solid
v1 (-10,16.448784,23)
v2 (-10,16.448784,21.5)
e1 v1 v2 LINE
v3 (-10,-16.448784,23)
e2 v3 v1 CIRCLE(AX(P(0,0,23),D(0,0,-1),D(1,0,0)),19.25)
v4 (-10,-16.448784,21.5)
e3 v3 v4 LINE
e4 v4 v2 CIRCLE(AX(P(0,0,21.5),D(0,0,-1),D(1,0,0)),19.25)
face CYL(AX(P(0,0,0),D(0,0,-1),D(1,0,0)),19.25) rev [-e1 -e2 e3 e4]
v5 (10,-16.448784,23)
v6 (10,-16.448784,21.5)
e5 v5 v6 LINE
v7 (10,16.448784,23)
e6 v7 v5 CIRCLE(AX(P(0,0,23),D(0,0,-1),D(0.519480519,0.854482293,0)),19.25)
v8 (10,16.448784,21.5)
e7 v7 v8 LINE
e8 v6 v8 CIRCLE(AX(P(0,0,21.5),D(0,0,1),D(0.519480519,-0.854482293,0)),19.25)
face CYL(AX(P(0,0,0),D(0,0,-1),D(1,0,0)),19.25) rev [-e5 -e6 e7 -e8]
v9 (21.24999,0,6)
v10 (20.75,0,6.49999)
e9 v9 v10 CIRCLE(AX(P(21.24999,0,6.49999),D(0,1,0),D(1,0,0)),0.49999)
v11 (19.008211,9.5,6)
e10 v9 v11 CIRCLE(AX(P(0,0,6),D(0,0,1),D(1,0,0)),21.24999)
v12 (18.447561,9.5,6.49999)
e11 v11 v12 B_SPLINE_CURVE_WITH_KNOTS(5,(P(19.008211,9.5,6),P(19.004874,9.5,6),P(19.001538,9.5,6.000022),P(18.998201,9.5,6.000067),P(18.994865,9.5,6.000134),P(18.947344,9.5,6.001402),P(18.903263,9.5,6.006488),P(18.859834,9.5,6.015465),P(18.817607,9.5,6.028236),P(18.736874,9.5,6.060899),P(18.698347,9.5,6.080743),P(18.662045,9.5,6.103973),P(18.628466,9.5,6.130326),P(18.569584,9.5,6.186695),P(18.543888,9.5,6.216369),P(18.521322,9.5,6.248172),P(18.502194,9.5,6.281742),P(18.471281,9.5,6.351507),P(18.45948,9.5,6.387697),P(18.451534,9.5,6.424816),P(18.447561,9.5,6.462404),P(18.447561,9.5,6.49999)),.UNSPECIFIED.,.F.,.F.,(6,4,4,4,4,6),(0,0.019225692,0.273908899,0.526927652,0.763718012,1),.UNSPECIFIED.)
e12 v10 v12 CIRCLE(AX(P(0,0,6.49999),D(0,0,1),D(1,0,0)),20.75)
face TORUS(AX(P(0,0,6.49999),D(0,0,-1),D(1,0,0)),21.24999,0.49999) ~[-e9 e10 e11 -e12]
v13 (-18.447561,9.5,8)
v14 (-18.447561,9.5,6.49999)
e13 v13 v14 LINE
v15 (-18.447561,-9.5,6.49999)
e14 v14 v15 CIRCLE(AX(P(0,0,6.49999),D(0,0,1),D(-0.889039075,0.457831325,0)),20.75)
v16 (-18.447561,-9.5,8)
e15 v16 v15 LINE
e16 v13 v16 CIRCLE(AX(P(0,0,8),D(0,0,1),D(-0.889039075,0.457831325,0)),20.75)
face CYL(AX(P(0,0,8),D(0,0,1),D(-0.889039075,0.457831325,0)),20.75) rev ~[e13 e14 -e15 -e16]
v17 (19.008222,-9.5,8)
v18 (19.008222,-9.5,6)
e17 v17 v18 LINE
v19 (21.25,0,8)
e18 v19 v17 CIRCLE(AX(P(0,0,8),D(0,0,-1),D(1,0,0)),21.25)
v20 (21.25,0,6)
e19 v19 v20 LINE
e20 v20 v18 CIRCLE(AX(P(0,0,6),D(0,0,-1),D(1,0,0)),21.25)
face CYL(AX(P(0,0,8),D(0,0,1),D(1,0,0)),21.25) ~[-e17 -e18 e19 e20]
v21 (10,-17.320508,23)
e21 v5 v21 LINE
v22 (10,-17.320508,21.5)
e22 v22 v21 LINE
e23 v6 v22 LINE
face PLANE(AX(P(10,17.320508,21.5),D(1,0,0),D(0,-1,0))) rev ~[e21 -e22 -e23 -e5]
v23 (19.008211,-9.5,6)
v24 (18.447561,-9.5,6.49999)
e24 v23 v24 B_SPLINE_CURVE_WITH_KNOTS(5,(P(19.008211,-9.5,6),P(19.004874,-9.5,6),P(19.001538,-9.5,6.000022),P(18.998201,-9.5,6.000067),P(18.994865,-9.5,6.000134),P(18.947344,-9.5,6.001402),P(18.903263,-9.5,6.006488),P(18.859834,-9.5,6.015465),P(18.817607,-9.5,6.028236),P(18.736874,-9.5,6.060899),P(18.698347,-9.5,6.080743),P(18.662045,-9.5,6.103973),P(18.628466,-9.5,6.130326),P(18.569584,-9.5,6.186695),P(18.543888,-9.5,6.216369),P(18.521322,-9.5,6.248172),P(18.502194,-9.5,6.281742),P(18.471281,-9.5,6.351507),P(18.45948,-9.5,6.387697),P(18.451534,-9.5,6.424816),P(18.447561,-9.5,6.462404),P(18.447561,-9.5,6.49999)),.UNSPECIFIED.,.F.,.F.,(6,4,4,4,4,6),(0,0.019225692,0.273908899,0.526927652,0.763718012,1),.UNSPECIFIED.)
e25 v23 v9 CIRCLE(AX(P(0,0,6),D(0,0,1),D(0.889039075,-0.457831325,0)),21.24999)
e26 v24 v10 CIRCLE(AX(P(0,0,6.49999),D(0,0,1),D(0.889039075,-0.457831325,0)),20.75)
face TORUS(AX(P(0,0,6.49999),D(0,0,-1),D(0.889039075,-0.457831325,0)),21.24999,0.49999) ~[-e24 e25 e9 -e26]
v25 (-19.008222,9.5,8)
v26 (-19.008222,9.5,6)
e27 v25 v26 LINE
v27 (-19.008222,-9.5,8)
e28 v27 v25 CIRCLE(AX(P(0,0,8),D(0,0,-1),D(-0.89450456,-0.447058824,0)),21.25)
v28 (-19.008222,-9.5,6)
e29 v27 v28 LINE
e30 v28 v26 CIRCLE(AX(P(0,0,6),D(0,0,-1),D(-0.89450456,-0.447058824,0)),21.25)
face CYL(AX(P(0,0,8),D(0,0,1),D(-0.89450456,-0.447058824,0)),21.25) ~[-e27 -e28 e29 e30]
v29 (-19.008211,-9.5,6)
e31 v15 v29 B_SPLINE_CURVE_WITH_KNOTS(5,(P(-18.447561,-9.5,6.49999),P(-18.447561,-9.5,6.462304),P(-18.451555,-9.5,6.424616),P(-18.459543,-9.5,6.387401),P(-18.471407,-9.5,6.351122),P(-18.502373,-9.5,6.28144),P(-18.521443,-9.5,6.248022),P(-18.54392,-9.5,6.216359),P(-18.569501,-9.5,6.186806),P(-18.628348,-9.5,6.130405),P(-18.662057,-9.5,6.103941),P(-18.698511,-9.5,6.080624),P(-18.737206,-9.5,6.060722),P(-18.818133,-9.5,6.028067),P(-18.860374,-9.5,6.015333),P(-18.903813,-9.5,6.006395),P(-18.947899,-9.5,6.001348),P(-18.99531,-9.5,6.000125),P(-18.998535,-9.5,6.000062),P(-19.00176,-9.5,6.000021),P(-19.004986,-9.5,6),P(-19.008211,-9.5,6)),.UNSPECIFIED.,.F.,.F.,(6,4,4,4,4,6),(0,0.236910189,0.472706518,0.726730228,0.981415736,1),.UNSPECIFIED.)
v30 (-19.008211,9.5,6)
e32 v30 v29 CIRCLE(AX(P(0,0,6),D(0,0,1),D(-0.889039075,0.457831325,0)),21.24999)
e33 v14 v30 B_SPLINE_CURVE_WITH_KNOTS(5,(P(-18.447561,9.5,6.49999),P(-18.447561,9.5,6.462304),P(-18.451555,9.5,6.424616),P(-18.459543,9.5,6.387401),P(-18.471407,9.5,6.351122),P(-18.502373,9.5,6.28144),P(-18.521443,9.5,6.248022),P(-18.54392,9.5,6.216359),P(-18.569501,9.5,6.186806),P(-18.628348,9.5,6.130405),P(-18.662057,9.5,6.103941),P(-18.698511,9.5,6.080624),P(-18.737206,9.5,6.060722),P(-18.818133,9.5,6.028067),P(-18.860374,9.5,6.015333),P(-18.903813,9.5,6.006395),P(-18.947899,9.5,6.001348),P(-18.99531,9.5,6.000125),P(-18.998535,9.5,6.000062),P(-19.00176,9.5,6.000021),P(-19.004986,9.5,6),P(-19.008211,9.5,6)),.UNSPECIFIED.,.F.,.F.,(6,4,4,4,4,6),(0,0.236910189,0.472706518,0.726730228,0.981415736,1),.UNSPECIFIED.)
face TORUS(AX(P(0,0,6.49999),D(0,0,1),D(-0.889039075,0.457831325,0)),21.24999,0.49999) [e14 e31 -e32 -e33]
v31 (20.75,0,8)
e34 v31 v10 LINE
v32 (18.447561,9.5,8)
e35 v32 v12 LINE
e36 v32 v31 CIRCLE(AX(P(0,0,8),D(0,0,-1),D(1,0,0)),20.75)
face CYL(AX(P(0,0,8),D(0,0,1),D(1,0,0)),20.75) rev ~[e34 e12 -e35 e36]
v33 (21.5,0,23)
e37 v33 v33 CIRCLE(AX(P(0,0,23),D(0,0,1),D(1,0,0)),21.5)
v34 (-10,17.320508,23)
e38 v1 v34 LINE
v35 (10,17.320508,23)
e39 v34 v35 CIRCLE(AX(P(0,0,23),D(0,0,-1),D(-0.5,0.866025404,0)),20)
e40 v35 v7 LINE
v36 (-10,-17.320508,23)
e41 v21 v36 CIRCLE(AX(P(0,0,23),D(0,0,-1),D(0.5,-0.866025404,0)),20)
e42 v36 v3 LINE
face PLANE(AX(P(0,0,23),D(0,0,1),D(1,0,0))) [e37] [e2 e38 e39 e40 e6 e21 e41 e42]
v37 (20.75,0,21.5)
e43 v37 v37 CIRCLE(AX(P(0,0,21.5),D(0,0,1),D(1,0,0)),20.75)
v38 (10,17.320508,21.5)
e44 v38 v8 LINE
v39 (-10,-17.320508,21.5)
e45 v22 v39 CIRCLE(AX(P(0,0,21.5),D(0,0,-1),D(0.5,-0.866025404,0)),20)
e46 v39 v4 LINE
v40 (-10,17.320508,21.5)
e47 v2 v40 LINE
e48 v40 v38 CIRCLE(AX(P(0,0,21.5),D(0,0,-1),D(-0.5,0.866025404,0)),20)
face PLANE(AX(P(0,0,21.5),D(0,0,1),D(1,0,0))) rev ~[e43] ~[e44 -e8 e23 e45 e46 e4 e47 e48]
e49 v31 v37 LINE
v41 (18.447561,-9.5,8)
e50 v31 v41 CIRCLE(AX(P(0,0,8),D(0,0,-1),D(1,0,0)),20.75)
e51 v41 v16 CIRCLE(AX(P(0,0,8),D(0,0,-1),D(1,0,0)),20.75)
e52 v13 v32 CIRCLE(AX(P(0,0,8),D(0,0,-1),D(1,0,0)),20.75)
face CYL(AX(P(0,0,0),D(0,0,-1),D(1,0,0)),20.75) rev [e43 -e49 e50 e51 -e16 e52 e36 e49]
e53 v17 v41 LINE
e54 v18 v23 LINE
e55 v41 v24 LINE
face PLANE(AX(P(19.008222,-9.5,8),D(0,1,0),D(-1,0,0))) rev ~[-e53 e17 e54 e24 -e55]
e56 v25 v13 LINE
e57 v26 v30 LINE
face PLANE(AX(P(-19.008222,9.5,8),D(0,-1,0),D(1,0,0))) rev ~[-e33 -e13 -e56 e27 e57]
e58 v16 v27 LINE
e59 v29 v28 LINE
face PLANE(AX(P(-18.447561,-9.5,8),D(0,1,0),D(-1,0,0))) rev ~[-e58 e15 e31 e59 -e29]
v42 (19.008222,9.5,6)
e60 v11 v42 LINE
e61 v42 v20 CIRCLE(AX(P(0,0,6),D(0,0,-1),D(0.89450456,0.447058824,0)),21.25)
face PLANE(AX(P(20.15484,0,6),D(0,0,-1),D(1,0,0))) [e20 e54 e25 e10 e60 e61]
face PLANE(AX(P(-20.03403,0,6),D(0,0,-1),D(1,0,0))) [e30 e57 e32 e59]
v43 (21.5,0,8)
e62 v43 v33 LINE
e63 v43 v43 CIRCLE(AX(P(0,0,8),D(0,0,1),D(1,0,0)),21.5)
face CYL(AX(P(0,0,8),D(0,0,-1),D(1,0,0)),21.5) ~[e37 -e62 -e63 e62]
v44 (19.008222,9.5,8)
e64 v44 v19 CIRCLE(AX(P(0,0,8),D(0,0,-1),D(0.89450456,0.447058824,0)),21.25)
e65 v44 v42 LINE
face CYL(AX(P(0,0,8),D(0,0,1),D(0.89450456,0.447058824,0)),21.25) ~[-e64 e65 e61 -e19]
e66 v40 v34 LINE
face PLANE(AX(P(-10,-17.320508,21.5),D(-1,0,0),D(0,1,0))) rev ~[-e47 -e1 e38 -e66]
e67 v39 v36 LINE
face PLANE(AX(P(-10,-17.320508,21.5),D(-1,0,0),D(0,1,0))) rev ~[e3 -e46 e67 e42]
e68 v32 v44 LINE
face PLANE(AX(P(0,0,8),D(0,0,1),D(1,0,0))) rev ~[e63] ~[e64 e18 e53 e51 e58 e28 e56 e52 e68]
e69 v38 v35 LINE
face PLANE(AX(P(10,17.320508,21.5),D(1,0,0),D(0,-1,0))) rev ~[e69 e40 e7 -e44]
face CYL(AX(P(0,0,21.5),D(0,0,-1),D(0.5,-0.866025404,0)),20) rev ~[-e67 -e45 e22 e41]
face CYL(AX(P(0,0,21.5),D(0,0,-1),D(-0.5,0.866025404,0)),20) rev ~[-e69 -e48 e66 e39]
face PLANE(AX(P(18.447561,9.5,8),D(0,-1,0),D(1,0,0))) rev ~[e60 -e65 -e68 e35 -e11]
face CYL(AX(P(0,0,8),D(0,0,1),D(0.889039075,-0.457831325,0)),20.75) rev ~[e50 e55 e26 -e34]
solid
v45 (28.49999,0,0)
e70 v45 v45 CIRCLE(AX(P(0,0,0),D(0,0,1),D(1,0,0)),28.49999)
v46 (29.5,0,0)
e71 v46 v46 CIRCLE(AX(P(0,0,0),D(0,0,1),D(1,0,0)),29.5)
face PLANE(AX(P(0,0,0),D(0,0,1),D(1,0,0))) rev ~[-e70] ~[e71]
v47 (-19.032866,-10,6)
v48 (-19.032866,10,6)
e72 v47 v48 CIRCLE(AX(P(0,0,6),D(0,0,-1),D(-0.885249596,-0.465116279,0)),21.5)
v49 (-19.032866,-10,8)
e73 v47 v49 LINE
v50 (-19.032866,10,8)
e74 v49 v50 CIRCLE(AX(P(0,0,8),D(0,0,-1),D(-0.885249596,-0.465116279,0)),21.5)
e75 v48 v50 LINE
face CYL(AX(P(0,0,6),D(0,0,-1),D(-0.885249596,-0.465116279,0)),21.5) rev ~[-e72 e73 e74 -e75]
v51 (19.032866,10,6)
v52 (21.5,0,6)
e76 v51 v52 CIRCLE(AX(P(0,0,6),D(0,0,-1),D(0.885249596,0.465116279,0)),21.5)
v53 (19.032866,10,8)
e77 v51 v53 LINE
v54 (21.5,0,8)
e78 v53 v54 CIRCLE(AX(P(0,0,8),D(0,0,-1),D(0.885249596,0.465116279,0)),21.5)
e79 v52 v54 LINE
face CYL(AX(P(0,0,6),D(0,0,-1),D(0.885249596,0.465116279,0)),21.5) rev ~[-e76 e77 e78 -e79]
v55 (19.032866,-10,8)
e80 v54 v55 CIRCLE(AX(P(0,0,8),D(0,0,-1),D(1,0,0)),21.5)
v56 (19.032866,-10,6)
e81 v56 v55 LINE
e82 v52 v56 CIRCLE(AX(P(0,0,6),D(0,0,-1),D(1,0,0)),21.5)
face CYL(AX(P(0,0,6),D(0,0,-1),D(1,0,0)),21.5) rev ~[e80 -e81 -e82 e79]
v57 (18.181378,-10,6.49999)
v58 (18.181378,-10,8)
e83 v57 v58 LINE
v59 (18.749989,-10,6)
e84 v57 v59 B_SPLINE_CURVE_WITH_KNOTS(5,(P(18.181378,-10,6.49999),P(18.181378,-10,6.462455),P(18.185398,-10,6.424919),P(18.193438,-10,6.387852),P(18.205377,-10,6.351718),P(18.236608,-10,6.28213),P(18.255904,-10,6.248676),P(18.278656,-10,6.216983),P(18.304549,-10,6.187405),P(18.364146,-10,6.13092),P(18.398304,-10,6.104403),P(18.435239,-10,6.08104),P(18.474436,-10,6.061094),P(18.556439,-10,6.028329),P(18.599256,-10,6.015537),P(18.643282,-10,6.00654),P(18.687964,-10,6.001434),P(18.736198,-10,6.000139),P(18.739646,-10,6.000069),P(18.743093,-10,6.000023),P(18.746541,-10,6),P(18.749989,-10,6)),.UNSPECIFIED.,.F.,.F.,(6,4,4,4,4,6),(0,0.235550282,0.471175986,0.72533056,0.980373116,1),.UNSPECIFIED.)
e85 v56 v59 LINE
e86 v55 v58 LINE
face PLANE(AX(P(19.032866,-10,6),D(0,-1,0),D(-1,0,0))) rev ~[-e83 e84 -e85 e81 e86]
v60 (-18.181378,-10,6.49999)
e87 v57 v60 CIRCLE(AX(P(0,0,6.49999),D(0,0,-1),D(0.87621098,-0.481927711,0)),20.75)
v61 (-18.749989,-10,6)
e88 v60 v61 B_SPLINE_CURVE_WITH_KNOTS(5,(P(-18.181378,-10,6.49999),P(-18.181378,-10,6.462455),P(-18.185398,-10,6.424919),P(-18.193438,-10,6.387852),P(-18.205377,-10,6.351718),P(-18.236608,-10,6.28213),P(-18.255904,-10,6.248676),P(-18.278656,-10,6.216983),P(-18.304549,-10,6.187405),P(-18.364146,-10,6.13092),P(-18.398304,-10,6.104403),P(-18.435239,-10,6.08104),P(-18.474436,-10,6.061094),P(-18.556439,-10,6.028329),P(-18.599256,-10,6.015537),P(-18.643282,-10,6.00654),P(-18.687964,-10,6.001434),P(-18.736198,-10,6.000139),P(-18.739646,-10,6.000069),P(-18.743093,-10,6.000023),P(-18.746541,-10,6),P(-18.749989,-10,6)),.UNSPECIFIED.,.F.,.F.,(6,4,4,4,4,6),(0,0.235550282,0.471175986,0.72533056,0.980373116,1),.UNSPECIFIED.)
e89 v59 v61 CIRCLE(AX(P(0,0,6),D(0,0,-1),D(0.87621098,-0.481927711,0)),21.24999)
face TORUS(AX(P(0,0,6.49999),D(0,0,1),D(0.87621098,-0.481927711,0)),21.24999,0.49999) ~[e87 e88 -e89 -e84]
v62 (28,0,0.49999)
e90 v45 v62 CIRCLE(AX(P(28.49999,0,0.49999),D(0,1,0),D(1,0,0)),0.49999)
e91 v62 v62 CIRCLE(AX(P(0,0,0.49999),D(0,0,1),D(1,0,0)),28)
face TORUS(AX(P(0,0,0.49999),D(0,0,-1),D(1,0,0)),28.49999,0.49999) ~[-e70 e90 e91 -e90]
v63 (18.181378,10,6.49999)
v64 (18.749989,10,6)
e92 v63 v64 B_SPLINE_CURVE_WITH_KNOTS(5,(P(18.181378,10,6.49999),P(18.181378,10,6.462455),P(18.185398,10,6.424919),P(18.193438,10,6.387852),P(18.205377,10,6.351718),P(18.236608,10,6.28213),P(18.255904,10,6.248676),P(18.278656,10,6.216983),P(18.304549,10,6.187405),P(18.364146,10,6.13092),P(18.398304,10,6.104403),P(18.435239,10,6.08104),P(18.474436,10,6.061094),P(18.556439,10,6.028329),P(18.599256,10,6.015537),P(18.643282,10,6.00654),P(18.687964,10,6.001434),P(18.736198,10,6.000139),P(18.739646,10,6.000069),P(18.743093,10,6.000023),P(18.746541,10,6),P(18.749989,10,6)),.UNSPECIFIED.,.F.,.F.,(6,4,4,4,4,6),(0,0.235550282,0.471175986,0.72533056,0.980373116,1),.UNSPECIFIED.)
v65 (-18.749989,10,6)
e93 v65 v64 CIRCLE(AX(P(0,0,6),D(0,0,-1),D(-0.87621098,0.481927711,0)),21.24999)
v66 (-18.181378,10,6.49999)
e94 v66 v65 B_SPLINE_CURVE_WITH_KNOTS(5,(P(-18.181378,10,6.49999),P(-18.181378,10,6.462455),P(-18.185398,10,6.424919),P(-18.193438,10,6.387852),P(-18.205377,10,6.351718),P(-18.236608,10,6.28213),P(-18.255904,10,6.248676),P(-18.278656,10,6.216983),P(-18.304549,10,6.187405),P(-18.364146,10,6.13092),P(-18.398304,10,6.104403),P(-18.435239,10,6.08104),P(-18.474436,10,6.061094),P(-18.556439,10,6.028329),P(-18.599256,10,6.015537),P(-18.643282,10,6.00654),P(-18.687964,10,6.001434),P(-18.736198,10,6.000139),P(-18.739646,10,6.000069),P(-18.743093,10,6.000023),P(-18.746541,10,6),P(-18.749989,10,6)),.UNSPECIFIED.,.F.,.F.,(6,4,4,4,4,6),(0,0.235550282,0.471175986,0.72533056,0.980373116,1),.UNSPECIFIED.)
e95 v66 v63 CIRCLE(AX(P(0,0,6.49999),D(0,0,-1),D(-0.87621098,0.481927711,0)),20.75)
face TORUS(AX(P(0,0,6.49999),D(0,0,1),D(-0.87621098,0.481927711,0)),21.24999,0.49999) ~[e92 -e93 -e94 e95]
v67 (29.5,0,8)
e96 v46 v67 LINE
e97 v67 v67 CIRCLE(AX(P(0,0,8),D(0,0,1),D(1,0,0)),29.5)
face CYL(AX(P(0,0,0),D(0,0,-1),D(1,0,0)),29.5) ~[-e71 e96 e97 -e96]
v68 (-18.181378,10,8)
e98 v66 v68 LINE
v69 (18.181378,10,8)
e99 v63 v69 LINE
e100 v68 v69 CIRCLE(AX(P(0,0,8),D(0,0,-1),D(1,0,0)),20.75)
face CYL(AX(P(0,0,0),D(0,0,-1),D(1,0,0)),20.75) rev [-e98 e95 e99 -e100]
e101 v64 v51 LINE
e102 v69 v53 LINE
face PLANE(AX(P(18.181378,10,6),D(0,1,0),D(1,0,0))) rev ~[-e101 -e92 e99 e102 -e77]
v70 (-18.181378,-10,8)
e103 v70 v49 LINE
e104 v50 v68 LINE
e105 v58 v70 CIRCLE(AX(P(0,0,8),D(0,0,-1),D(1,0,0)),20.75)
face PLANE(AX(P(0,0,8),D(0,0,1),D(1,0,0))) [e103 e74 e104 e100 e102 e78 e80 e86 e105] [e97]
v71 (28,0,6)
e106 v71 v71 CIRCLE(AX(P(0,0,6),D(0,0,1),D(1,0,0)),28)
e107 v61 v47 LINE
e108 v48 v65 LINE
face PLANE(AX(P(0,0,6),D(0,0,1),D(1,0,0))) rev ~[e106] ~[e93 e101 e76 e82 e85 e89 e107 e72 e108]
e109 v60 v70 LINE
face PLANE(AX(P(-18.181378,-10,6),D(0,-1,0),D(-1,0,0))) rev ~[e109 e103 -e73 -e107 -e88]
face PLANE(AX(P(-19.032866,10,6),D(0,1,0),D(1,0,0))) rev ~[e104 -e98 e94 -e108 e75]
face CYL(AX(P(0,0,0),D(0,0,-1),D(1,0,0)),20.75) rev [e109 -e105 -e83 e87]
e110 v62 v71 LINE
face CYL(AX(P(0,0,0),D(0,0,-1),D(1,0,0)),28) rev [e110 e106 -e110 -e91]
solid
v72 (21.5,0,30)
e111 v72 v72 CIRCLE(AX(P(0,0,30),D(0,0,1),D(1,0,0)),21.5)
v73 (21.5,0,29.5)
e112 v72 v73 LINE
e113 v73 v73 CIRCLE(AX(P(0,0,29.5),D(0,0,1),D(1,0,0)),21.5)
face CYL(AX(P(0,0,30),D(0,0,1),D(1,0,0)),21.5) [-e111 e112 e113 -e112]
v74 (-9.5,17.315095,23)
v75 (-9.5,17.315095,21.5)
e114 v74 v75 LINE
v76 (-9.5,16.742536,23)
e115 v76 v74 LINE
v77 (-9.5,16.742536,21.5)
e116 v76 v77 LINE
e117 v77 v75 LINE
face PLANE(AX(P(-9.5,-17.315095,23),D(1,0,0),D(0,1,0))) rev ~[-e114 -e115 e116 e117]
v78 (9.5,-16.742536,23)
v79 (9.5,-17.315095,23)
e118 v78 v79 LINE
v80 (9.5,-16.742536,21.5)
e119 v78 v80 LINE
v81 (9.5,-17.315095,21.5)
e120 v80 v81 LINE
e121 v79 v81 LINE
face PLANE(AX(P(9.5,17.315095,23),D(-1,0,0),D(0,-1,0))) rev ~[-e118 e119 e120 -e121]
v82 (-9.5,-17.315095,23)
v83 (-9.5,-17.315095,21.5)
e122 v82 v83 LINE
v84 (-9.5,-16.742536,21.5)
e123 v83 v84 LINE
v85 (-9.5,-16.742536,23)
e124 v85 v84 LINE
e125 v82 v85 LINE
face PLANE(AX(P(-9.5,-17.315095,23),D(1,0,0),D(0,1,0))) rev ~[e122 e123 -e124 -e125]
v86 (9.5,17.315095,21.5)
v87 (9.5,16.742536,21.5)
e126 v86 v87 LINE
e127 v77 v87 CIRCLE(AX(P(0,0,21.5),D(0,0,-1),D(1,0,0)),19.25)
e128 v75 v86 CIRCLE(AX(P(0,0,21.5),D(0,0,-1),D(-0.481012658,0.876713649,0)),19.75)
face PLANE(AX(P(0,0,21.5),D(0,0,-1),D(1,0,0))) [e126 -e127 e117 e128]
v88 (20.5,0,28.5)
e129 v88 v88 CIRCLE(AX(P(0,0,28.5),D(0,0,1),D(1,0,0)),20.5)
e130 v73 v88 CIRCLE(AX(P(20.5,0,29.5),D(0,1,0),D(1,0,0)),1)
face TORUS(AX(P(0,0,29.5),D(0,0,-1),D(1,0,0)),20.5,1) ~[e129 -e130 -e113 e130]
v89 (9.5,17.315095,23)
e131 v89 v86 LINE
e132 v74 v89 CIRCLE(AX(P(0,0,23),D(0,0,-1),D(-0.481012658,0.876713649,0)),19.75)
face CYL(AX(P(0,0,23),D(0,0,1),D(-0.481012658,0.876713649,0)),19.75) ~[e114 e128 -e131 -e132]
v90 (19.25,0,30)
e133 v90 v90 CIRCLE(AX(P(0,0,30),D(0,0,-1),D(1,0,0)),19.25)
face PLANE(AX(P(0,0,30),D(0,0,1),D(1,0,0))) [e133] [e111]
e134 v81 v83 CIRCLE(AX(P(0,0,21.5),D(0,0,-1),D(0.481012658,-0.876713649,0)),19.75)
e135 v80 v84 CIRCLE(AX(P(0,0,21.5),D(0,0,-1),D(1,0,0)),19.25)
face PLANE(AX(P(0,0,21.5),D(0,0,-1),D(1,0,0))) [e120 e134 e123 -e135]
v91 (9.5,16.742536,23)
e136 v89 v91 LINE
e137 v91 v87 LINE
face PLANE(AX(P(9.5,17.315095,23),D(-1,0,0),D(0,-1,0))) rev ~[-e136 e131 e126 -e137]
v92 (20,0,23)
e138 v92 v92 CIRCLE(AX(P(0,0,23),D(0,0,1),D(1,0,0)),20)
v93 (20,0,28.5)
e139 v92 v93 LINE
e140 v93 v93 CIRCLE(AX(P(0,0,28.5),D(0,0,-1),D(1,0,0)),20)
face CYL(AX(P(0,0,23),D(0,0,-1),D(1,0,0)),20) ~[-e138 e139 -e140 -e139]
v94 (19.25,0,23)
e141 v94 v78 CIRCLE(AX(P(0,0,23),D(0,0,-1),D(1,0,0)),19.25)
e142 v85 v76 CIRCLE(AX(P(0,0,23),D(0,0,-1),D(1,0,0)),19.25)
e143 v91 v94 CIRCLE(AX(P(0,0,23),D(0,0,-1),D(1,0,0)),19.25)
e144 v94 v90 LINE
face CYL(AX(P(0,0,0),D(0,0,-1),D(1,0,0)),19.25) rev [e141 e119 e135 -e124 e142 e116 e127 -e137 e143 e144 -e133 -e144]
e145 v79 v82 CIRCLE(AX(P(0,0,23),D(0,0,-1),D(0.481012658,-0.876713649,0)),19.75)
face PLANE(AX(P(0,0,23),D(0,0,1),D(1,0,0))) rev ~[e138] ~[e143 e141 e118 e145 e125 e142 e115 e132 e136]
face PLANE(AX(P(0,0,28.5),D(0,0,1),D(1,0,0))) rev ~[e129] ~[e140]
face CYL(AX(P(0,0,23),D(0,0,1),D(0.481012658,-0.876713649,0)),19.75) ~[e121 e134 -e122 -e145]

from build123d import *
from build123d import SkipClean  # not in build123d's __all__

# Parameters (mm, degrees)
F1_R      = 29.5
F2_DEPTH  = 8
F0_R      = 28
F3_DEPTH  = 6
F4_R      = 21.5
F5_DEPTH  = 15
F6_R      = 20.75
F7_DEPTH  = 21.5
F8_R      = 20
F9_DEPTH  = 7
F12_DEPTH = 1.5
F14_DEPTH = 2
F15_DEPTH = 1.5
F17_DEPTH = 2
F19_DEPTH = 2
F20_R     = 0.49999
F20_2_R   = 0.49999
F21_R     = 21.5
F22_DEPTH = 1.5
F10_R     = 19.25
F23_DEPTH = 50
F24_R     = 1


# Not quite as in the source:
# - a fillet or chamfer is up to 0.001 mm smaller than in the source, because OpenCascade refuses the exact size
# - a feature of the source that left no trace in its solid (it failed there, or was rolled back) is left out


with BuildPart() as f2:
    # F1 (on Top) → F2 (new body)
    with BuildSketch(Plane.XY):
        Circle(F1_R)
    extrude(amount=F2_DEPTH)

    # F0 (on Top) → F3 (cut)
    with BuildSketch(Plane.XY):
        Circle(F0_R)
    extrude(amount=F3_DEPTH, mode=Mode.SUBTRACT)


with BuildPart() as f5:
    # F4 (on face) → F5 (new body)
    with BuildSketch(Plane.XY.offset(8)):
        Circle(F4_R)
    extrude(amount=F5_DEPTH)


with BuildPart() as f7_tool:
    # F6 (on Top) → F7 (new body)
    with BuildSketch(Plane.XY):
        Circle(F6_R)
    extrude(amount=F7_DEPTH)


with BuildPart() as f2_1:
    add(f2.part, clean=False)

    # F7: cut by f7_tool
    add(f7_tool.part, mode=Mode.SUBTRACT)

    # F11 (on face) → F14 (cut)
    with BuildSketch(Plane(origin=(0, 0, 21.5), x_dir=(1, 0, 0), z_dir=(0, 0, -1))):
        with BuildLine():
            ThreePointArc((10, 17.3205080757), (0, 20), (-10, 17.3205080757))
            Line((-10, 17.3205080757), (-10, -17.3205080757))
            ThreePointArc((-10, -17.3205080757), (0, -20), (10, -17.3205080757))
            Line((10, -17.3205080757), (10, 17.3205080757))
        make_face()
    extrude(amount=F14_DEPTH, mode=Mode.SUBTRACT)

    # F16 (on face) → F17 (cut)
    with BuildSketch(Plane(origin=(0, 0, 6), x_dir=(1, 0, 0), z_dir=(0, 0, -1))):
        with BuildLine():
            Line((-18.1813778356, 10), (-19.0328663107, 10))
            ThreePointArc((-19.0328663107, 10), (-21.5, 0), (-19.0328663107, -10))
            Line((-19.0328663107, -10), (-18.1813778356, -10))
            ThreePointArc((-18.1813778356, -10), (-20.75, 0), (-18.1813778356, 10))
        make_face()
        with BuildLine():
            ThreePointArc((21.5, 0), (20.8741062764, 5.1499210829), (19.0328663107, 10))
            Line((19.0328663107, 10), (18.1813778356, 10))
            ThreePointArc((18.1813778356, 10), (20.0975880405, 5.1623110092), (20.75, 0))
            ThreePointArc((20.75, 0), (20.0975880405, -5.1623110092), (18.1813778356, -10))
            Line((18.1813778356, -10), (19.0328663107, -10))
            ThreePointArc((19.0328663107, -10), (20.8741062764, -5.1499210829), (21.5, 0))
        make_face()
    extrude(amount=-F17_DEPTH, mode=Mode.SUBTRACT)

    # F20 (radius 0.5 in the source; OpenCascade refuses exactly that, so slightly less here)
    f20_edges = [f2_1.edges().sort_by_distance(p)[0] for p in [
        (-28, 0, 0),
        (0, -20.75, 6),
        (0, 20.75, 6),
    ]]
    fillet(f20_edges, radius=F20_R)


with BuildPart() as f5_1:
    add(f5.part, clean=False)

    # F7: cut by f7_tool
    add(f7_tool.part, mode=Mode.SUBTRACT)

    # F11 (on face) → F12 (cut)
    with BuildSketch(Plane(origin=(0, 0, 21.5), x_dir=(1, 0, 0), z_dir=(0, 0, -1))):
        with BuildLine():
            ThreePointArc((10, 17.3205080757), (0, 20), (-10, 17.3205080757))
            Line((-10, 17.3205080757), (-10, -17.3205080757))
            ThreePointArc((-10, -17.3205080757), (0, -20), (10, -17.3205080757))
            Line((10, -17.3205080757), (10, 17.3205080757))
        make_face()
    extrude(amount=-F12_DEPTH, mode=Mode.SUBTRACT)

    # F18 (on face) → F19 (join)
    with BuildSketch(Plane(origin=(0, 0, 8), x_dir=(1, 0, 0), z_dir=(0, 0, -1))):
        with BuildLine():
            Line((-18.4475608144, 9.5), (-19.0082219053, 9.5))
            ThreePointArc((-19.0082219053, 9.5), (-21.25, 0), (-19.0082219053, -9.5))
            Line((-19.0082219053, -9.5), (-18.4475608144, -9.5))
            ThreePointArc((-18.4475608144, -9.5), (-20.75, 0), (-18.4475608144, 9.5))
        make_face()
        with BuildLine():
            ThreePointArc((21.25, 0), (20.6819633435, 4.8804602505), (19.0082219053, 9.5))
            Line((19.0082219053, 9.5), (18.4475608144, 9.5))
            ThreePointArc((18.4475608144, 9.5), (20.1661769666, 4.887515376), (20.75, 0))
            ThreePointArc((20.75, 0), (20.1661769666, -4.887515376), (18.4475608144, -9.5))
            Line((18.4475608144, -9.5), (19.0082219053, -9.5))
            ThreePointArc((19.0082219053, -9.5), (20.6819633435, -4.8804602505), (21.25, 0))
        make_face()
    with SkipClean():  # cleaning this boolean's faces spoils the solid; the shape is the same uncleaned
        extrude(amount=F19_DEPTH)

    # F20#2 (radius 0.5 in the source; OpenCascade refuses exactly that, so slightly less here)
    f20_2_edges = [f5_1.edges().sort_by_distance(p)[0] for p in [
        (20.75, 0, 6),
        (-20.75, 0, 6),
    ]]
    fillet(f20_2_edges, radius=F20_2_R)


with BuildPart() as f9:
    # F8 (on face) → F9 (new body)
    with BuildSketch(Plane.XY.offset(23)):
        Circle(F8_R)
    extrude(amount=F9_DEPTH)

    # F13 (on face) → F15 (join)
    with BuildSketch(Plane(origin=(0, 0, 23), x_dir=(1, 0, 0), z_dir=(0, 0, -1))):
        with BuildLine():
            ThreePointArc((9.5, 17.3150945709), (0, 19.75), (-9.5, 17.3150945709))
            Line((-9.5, 17.3150945709), (-9.5, -17.3150945709))
            ThreePointArc((-9.5, -17.3150945709), (0, -19.75), (9.5, -17.3150945709))
            Line((9.5, -17.3150945709), (9.5, 17.3150945709))
        make_face()
    extrude(amount=F15_DEPTH)

    # F21 (on face) → F22 (join)
    with BuildSketch(Plane.XY.offset(30)):
        Circle(F21_R)
    extrude(amount=-F22_DEPTH)


with BuildPart() as f23_tool:
    # F10 (on Top) → F23 (new body)
    with BuildSketch(Plane.XY):
        Circle(F10_R)
    extrude(amount=F23_DEPTH)


with BuildPart() as f5_2:
    add(f5_1.part, clean=False)

    # F23: cut by f23_tool
    add(f23_tool.part, mode=Mode.SUBTRACT)


with BuildPart() as f9_1:
    add(f9.part, clean=False)

    # F23: cut by f23_tool
    add(f23_tool.part, mode=Mode.SUBTRACT)

    # F24
    f24_edges = [f9_1.edges().sort_by_distance(p)[0] for p in [
        (-21.5, 0, 28.5),
    ]]
    fillet(f24_edges, radius=F24_R)


solid = Compound([f2_1.part, f5_2.part, f9_1.part])
